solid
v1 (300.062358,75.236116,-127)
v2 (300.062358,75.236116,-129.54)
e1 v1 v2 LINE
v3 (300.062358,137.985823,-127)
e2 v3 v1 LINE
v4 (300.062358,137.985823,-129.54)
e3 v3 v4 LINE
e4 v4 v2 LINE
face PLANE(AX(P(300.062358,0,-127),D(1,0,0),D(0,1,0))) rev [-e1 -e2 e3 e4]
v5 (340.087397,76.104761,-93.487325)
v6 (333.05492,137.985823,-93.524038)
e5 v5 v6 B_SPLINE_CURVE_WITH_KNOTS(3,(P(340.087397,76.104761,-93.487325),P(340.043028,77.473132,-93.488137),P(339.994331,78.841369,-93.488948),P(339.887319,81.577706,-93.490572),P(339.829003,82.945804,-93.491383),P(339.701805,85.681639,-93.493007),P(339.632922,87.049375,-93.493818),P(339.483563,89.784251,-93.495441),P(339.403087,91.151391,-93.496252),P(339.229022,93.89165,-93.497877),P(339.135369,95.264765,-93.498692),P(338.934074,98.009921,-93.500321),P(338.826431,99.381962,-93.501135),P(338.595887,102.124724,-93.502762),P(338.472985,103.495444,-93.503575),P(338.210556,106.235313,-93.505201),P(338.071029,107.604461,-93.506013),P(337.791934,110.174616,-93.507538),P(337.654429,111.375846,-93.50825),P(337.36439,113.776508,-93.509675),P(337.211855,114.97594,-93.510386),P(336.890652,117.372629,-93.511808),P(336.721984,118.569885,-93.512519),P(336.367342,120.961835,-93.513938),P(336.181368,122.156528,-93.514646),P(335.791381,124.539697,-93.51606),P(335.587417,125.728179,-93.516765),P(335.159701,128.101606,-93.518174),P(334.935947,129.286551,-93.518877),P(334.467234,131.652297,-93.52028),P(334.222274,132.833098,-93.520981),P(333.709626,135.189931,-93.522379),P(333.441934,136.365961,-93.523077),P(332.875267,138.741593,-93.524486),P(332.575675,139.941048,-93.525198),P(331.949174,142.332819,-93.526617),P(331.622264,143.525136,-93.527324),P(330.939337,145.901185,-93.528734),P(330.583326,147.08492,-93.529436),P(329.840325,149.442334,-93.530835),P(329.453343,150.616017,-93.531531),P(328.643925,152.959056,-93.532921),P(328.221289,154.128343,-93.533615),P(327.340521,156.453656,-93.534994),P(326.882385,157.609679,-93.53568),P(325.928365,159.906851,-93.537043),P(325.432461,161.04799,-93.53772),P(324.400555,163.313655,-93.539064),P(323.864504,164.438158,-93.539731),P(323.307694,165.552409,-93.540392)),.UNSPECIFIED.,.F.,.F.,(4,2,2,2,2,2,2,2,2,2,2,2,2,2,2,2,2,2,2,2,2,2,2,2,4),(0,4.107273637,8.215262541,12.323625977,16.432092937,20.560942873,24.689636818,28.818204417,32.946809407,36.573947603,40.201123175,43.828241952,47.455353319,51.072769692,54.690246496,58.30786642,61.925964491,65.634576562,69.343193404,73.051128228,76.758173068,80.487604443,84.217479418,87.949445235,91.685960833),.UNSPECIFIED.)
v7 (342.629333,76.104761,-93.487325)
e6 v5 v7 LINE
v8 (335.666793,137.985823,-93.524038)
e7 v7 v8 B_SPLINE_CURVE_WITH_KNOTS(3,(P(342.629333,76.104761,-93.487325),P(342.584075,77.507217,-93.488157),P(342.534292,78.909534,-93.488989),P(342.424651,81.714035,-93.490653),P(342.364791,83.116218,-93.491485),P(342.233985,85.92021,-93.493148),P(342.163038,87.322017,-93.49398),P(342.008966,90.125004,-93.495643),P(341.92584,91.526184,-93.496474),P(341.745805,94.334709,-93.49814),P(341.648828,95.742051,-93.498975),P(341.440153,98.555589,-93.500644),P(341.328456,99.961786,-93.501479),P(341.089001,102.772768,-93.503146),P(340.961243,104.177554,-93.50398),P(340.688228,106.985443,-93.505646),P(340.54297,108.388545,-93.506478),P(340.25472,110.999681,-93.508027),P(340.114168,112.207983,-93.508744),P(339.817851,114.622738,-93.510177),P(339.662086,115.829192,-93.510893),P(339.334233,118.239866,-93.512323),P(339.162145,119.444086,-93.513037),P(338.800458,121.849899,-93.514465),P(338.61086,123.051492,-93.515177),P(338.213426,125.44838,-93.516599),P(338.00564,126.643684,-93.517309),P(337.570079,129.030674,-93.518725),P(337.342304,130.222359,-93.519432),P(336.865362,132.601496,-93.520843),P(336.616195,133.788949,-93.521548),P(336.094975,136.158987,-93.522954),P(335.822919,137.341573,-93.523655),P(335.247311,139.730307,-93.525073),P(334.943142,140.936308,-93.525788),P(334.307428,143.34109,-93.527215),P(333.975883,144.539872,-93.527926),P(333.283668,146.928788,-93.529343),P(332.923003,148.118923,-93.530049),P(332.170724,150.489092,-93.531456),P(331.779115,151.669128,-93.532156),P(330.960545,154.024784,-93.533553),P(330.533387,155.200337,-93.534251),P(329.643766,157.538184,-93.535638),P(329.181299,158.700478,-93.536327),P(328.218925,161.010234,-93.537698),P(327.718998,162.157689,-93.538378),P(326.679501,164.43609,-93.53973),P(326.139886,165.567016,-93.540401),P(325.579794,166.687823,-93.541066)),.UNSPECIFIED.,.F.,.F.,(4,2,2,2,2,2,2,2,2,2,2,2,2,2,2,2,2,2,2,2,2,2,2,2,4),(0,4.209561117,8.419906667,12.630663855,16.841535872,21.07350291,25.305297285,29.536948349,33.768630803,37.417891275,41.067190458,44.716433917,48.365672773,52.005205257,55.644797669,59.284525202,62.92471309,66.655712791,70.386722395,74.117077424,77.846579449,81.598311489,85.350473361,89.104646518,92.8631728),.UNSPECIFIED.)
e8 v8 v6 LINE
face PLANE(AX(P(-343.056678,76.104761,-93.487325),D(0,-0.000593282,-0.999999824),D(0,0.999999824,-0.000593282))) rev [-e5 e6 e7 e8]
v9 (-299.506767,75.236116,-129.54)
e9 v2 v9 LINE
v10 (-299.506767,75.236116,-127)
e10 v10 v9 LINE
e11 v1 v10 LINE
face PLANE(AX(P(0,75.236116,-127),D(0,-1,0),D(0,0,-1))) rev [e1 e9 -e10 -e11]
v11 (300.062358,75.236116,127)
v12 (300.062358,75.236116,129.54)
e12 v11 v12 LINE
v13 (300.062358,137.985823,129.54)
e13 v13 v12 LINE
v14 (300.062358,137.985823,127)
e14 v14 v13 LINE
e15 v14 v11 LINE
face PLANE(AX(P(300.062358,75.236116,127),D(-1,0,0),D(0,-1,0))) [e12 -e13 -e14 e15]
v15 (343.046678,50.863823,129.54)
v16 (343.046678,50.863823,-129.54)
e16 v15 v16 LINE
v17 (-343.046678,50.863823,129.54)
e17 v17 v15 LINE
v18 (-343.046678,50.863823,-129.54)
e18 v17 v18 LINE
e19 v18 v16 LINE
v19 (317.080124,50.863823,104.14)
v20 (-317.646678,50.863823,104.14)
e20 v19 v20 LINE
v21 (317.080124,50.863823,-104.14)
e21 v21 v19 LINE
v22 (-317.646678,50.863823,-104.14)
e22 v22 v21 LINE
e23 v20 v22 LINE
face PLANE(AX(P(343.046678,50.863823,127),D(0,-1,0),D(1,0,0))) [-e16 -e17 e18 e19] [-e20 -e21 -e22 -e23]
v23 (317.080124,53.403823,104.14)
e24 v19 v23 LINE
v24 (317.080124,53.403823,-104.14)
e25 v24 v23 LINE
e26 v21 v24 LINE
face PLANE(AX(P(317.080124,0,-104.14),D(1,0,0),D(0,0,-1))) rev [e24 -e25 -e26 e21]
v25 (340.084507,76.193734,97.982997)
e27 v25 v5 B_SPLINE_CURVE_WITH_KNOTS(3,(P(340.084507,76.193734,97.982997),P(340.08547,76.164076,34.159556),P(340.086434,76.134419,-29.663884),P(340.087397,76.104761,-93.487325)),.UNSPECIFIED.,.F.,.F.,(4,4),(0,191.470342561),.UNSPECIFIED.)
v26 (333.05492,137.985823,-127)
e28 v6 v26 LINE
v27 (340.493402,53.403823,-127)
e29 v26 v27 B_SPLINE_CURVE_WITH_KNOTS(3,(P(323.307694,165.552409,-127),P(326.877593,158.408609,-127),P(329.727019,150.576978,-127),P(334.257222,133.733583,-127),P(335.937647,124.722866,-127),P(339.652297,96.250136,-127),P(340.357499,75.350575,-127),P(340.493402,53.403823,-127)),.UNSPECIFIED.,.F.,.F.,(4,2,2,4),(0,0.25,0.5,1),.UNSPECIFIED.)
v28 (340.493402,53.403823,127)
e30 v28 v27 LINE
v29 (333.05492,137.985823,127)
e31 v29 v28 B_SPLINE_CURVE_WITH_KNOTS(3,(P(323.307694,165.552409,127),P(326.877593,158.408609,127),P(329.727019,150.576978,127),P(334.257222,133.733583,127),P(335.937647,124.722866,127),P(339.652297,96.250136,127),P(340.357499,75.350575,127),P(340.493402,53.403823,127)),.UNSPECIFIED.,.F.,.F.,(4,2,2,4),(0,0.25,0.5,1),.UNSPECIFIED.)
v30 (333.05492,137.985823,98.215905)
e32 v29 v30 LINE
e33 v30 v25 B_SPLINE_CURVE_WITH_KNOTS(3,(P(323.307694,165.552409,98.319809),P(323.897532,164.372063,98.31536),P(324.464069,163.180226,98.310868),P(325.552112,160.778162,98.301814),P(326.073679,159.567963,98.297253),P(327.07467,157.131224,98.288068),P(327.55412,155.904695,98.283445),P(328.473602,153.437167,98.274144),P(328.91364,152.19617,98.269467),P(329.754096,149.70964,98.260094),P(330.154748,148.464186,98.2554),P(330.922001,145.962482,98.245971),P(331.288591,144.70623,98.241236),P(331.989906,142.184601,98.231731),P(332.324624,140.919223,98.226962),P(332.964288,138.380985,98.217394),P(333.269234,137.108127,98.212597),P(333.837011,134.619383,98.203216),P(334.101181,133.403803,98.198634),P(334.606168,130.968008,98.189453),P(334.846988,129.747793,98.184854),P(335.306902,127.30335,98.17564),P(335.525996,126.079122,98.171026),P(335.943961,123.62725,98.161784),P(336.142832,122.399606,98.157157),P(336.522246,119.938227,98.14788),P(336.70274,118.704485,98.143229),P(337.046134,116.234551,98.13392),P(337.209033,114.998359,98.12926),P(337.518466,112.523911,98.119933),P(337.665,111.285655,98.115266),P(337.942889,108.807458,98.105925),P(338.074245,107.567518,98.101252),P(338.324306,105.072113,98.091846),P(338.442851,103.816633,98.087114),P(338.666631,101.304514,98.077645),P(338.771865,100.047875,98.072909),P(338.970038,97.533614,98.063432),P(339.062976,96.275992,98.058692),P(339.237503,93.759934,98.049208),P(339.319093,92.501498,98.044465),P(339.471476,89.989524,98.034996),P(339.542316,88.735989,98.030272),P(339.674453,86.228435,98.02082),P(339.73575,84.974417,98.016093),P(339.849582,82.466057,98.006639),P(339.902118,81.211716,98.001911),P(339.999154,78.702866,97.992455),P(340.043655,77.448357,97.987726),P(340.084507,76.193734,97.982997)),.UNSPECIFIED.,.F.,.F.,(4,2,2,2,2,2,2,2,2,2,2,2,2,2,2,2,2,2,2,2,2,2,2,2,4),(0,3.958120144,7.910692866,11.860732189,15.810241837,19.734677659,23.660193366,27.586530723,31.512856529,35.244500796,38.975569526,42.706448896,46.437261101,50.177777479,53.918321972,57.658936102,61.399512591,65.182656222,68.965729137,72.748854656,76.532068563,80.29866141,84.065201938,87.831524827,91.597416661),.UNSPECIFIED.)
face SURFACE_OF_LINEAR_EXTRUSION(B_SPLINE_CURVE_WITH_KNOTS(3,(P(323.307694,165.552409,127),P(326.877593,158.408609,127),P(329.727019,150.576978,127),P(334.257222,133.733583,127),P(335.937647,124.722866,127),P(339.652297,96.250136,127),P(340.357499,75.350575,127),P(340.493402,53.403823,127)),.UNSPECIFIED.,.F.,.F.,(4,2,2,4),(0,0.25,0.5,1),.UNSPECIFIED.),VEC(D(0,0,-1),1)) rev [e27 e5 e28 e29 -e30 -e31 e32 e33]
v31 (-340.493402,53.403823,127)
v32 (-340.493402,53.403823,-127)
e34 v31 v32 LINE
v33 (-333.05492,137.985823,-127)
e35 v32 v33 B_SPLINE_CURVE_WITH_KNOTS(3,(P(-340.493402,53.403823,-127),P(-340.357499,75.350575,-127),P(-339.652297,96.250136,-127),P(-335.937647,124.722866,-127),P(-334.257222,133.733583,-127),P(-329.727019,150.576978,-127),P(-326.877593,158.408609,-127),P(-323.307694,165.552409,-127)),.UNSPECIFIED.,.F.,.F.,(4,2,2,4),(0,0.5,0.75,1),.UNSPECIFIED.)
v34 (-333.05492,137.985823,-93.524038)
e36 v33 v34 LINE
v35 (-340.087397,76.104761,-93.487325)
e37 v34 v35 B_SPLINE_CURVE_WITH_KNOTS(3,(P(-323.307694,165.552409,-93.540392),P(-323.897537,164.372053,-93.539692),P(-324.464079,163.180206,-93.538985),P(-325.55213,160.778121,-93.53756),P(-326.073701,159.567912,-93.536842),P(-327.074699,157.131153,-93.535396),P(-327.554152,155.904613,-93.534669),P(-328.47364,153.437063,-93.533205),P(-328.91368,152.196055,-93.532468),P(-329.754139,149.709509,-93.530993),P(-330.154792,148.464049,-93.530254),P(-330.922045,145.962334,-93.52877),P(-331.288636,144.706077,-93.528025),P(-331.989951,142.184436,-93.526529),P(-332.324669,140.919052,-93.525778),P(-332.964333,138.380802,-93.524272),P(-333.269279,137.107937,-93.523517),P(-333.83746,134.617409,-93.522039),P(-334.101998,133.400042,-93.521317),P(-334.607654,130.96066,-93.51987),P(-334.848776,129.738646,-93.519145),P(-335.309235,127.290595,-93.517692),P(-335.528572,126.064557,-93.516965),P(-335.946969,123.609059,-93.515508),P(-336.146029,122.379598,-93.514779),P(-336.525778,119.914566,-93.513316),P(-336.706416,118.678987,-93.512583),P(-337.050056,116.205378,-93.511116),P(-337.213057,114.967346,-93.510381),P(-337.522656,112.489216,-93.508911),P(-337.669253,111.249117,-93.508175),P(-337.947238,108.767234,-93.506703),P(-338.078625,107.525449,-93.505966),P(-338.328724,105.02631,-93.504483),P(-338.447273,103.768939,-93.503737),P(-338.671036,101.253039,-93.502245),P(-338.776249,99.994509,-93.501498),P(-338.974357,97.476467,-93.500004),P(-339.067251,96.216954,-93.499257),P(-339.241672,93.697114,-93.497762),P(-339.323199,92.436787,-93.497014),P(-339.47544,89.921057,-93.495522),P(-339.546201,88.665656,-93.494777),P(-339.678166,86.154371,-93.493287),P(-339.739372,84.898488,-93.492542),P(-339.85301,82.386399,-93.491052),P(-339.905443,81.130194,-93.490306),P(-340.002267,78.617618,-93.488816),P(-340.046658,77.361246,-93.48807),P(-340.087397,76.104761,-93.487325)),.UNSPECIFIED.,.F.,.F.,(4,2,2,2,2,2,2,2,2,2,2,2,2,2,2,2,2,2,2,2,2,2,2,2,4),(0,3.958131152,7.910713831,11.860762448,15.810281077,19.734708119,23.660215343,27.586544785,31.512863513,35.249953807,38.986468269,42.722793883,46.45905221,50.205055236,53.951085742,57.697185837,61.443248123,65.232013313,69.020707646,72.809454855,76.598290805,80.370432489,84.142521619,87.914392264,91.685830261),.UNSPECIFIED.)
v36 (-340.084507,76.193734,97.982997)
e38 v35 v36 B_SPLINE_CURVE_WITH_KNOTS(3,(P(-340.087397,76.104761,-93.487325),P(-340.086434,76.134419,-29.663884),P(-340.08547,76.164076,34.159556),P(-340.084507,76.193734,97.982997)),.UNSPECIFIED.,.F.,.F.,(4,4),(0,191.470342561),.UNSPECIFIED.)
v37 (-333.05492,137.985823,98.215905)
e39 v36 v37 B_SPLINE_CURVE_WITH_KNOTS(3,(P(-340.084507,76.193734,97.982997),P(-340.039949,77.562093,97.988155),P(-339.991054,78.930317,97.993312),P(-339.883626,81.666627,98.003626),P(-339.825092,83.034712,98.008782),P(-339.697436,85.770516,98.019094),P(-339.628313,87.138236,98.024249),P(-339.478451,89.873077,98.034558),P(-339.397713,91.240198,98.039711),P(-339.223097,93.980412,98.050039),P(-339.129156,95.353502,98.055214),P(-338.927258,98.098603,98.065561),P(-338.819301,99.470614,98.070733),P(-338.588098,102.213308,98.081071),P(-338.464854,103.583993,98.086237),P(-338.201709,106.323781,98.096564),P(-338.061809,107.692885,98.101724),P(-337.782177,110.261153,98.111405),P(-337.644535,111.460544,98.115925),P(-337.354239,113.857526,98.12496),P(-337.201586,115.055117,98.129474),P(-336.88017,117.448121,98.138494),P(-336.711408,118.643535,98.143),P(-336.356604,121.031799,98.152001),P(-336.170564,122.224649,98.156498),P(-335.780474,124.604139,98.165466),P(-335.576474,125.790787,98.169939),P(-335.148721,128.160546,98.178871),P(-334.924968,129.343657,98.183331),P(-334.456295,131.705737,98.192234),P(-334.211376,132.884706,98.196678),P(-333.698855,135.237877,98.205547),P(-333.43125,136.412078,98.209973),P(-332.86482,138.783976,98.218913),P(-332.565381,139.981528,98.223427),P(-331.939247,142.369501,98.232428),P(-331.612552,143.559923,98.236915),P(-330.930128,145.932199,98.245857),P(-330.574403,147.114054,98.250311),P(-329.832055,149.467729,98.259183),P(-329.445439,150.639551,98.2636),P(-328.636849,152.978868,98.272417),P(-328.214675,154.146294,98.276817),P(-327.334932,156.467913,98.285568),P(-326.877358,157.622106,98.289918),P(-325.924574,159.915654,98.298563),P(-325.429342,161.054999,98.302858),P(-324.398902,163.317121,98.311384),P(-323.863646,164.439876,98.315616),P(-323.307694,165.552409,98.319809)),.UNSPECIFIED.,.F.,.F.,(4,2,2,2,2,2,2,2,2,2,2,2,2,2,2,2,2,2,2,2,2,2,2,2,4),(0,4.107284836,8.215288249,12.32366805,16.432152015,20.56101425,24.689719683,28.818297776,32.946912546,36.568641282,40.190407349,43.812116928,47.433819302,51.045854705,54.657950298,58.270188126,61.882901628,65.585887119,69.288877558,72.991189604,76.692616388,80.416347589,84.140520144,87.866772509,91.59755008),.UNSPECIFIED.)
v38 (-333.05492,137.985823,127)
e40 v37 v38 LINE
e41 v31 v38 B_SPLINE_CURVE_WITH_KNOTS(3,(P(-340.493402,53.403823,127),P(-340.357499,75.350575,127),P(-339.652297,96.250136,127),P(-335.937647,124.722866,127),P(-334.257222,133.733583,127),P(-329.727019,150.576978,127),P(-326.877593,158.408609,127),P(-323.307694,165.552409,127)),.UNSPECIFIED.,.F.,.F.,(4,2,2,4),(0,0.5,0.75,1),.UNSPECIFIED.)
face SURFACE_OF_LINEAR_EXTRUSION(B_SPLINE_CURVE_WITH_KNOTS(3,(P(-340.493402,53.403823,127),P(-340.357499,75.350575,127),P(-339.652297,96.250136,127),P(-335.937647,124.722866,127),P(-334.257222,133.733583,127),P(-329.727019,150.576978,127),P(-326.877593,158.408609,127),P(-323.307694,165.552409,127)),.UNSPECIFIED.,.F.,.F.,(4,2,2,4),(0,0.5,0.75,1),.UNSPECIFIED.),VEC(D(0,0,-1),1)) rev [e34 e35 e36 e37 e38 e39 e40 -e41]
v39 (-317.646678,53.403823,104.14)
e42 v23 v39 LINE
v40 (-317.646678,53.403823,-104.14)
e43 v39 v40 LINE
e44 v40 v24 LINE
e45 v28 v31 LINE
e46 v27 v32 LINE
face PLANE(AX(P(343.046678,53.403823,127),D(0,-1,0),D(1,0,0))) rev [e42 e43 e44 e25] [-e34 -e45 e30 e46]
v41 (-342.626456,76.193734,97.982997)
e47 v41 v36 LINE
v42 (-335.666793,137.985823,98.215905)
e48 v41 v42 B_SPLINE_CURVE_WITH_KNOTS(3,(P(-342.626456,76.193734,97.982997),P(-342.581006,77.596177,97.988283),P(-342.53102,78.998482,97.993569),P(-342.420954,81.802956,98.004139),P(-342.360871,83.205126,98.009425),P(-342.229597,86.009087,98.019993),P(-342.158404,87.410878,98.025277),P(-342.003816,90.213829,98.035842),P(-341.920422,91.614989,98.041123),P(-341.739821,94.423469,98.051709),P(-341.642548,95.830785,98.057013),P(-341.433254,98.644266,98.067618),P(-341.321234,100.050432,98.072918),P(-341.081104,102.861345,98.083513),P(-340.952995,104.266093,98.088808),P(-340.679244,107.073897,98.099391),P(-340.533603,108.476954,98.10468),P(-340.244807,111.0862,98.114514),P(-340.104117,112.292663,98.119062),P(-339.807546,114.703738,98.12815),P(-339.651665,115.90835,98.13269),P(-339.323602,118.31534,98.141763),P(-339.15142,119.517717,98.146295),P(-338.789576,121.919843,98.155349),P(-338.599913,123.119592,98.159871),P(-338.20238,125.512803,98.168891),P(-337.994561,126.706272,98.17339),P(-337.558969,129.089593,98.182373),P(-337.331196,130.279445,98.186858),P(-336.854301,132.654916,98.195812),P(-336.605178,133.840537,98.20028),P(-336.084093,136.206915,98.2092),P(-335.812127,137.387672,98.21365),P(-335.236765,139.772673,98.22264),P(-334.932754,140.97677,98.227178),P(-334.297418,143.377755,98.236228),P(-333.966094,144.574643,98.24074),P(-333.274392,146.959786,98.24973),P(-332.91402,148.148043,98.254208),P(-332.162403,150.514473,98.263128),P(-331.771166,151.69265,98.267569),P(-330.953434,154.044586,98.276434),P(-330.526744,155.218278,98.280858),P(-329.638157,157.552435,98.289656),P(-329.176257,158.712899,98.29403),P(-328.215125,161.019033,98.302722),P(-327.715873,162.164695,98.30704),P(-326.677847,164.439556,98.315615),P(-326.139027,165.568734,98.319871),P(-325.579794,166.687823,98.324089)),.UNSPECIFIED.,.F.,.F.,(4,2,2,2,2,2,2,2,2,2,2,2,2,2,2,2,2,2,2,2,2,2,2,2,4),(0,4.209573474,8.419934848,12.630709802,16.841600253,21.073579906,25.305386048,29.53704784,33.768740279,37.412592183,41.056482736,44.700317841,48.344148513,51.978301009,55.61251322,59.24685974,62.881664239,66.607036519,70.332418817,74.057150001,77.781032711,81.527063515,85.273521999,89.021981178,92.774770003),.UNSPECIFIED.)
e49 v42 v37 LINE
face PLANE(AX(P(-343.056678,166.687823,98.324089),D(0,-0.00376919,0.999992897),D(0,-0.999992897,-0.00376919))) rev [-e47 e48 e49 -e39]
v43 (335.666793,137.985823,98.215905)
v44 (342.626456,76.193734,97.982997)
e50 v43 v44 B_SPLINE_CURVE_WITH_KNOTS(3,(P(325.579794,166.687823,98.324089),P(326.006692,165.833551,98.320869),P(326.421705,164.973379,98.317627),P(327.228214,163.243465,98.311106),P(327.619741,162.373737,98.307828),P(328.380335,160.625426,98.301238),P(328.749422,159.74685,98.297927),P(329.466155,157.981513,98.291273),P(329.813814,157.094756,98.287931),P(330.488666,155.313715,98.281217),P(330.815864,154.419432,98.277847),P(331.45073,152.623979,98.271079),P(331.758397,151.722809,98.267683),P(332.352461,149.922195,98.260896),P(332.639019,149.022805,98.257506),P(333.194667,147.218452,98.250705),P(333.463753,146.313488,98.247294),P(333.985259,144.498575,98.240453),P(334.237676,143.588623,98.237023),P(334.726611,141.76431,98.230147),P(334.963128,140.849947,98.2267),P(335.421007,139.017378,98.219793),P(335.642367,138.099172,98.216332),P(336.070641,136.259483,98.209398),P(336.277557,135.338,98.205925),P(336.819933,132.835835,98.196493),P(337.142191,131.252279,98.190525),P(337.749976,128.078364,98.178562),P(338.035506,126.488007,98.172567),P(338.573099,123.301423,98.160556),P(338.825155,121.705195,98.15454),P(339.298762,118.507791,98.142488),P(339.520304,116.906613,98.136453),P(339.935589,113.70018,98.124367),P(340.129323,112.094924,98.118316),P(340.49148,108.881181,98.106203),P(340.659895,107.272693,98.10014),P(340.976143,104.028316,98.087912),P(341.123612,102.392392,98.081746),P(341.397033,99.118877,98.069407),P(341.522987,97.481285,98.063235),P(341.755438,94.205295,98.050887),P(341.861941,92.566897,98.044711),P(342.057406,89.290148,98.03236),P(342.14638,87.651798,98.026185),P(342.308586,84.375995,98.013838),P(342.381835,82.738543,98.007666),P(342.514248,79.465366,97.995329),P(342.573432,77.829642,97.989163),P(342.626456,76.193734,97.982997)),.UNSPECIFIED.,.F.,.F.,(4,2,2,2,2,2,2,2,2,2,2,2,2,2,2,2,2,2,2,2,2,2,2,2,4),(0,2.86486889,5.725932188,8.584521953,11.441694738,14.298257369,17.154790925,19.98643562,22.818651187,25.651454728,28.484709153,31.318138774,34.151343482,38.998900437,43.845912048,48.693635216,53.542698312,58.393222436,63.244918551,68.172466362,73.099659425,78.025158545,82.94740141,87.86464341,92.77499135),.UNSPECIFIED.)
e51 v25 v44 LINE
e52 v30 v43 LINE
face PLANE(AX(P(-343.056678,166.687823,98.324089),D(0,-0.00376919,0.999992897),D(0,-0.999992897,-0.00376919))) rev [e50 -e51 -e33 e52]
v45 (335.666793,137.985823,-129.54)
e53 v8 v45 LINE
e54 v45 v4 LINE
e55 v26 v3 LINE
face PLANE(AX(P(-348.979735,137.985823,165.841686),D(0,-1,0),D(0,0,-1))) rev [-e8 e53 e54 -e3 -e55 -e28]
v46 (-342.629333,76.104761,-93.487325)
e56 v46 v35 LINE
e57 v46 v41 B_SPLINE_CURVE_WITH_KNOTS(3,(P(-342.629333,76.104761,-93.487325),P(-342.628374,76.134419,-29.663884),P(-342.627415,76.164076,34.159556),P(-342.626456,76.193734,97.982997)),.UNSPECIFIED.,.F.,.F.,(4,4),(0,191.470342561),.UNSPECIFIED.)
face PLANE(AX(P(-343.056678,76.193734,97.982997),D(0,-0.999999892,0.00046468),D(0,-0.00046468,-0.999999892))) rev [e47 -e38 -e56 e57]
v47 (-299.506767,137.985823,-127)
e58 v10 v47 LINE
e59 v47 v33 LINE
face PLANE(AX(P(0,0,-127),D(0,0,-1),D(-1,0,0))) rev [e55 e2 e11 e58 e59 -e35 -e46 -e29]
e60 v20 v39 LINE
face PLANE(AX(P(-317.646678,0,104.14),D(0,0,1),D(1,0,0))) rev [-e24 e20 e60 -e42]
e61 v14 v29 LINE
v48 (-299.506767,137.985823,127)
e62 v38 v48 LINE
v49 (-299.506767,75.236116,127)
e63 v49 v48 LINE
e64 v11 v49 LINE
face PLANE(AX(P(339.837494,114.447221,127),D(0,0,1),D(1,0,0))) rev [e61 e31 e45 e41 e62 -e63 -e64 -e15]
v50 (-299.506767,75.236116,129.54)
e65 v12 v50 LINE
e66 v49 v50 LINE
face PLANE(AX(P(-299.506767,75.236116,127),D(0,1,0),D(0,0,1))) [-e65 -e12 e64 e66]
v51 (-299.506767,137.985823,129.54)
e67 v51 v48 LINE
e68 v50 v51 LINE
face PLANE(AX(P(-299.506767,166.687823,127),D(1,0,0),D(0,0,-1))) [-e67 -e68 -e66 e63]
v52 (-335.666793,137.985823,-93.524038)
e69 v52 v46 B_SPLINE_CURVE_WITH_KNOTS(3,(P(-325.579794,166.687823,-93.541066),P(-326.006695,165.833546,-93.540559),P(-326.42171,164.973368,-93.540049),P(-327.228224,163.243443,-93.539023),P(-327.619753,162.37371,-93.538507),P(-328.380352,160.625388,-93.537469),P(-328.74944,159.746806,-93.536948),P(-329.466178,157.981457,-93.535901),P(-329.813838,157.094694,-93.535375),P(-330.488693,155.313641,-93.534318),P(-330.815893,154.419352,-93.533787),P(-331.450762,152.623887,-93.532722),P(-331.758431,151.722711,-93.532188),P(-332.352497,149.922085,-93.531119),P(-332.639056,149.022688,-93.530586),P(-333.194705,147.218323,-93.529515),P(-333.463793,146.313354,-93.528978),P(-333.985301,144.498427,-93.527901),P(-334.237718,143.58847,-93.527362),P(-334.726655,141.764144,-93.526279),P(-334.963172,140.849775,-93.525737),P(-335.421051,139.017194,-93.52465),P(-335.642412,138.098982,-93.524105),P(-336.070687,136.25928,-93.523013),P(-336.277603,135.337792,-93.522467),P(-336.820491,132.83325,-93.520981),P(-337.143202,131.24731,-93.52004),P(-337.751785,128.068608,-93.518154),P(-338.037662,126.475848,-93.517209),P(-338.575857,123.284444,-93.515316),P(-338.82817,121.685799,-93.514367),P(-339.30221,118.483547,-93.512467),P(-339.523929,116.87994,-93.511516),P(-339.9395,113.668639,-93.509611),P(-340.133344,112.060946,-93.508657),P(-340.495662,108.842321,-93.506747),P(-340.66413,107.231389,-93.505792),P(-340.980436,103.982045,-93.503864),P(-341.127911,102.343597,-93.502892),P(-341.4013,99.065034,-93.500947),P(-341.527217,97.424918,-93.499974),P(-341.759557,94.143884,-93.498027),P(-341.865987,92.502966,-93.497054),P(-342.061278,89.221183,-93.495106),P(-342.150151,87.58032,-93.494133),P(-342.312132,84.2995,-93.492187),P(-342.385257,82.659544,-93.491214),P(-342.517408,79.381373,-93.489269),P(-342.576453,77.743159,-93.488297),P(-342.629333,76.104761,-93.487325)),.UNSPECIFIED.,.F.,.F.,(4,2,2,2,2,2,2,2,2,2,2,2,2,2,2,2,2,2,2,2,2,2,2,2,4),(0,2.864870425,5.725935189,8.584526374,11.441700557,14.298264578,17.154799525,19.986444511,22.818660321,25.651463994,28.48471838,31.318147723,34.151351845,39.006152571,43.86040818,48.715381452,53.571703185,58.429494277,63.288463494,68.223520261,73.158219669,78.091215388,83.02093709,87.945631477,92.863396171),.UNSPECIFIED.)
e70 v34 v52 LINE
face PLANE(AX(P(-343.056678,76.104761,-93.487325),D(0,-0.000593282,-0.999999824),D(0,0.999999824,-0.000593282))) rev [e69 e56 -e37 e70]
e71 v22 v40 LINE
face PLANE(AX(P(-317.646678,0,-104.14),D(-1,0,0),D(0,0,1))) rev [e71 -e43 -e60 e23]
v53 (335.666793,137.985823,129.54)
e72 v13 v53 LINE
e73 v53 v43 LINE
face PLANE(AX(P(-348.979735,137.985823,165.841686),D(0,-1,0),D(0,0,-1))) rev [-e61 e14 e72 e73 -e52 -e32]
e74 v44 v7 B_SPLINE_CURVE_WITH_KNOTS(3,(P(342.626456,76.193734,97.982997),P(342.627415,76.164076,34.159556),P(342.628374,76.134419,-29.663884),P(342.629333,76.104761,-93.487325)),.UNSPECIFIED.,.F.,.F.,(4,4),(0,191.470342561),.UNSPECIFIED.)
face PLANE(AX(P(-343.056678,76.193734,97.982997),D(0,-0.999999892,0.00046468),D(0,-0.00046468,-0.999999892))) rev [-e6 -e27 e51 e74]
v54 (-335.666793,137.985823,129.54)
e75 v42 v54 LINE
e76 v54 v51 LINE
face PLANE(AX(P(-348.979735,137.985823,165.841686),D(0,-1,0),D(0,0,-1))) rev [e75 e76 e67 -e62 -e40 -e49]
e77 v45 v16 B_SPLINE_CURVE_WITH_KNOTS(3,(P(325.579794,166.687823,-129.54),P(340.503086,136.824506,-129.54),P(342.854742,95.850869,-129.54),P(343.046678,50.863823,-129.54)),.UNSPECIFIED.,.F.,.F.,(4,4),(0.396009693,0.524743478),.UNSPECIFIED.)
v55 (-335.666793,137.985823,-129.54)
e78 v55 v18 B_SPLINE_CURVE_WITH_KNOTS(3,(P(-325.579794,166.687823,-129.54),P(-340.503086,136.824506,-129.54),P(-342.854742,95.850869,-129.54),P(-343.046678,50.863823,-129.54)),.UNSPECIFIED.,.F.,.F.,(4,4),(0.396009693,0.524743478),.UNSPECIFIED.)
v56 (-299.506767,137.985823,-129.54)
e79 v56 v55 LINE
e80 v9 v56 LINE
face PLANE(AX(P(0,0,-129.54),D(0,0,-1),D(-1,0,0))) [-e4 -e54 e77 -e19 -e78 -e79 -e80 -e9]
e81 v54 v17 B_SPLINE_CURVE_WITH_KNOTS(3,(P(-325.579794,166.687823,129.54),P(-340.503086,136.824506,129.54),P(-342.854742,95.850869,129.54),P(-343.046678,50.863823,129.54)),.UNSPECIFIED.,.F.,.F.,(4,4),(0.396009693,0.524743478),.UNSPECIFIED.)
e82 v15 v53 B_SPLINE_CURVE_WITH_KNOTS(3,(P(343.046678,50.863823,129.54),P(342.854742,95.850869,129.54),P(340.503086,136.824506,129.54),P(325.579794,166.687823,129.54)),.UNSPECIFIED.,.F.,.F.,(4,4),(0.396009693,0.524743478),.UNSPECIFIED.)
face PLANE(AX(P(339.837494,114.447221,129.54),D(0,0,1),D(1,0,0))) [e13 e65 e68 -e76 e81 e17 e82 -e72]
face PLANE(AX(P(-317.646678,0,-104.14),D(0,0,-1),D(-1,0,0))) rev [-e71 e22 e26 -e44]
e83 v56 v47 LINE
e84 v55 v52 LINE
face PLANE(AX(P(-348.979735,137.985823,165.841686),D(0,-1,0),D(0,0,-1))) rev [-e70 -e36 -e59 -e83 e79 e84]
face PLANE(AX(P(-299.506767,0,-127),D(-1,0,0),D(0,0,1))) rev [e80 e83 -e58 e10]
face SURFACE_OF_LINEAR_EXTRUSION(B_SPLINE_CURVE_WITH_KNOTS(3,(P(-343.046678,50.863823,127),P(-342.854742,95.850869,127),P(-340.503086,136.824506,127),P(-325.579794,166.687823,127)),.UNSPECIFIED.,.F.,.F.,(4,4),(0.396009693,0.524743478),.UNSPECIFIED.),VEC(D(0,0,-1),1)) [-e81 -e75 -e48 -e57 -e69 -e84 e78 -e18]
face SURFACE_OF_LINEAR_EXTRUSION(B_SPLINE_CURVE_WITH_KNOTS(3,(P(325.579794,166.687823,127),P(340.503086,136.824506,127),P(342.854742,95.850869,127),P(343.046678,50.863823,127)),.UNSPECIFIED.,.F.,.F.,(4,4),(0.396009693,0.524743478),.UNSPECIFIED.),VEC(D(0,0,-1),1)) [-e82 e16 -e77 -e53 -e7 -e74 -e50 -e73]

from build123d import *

# Parameters (mm, degrees)
EXTRUDE_THIN2_START    = -127
EXTRUDE_THIN2_DEPTH    = 254
SPLIT1_SURFACE_1_BACK  = 741.713
SPLIT1_SURFACE_1_DEPTH = 1483.426
BOSS_EXTRUDE2_DEPTH    = 2.54
BOSS_EXTRUDE3_DEPTH    = 2.54
SPLIT2_SURFACE_2_BACK  = 743.47
SPLIT2_SURFACE_2_DEPTH = 1486.94
SPLIT3_SURFACE_3_BACK  = 743.47
SPLIT3_SURFACE_3_DEPTH = 1486.94


# Read off the part's stored shape, not the designer's step: Extrude-Thin2
with BuildPart() as part:
    # Extrude-Thin2 outline → Extrude-Thin2 (new body)
    with BuildSketch(Plane.XY.offset(EXTRUDE_THIN2_START)):
        with BuildLine():
            Line((-325.542449195, 166.687822519), (-325.542449195, 166.669160537))
            Line((-325.542449195, 166.669160537), (-325.579794085, 166.687822519))
            add(Edge.make_bspline(
                [(-343.046678298, 50.863822519), (-342.854742326, 95.850869045), (-340.503085509, 136.824505781), (-325.579794085, 166.687822519)],
                knots=[0.396009693, 0.396009693, 0.396009693, 0.396009693, 0.524743478, 0.524743478, 0.524743478, 0.524743478], degree=3))
            Line((-343.046678298, 50.863822519), (343.046678298, 50.863822519))
            add(Edge.make_bspline(
                [(325.579794084, 166.687822519), (340.503085509, 136.824505781), (342.854742326, 95.850869045), (343.046678298, 50.863822519)],
                knots=[0.396009693, 0.396009693, 0.396009693, 0.396009693, 0.524743478, 0.524743478, 0.524743478, 0.524743478], degree=3))
            Line((325.579794084, 166.687822519), (323.307694442, 165.552409283))
            add(Edge.make_bspline(
                [(323.307694442, 165.552409283), (326.877593275, 158.408608594), (329.727019011, 150.576977672), (334.257221566, 133.733582984), (335.93764666, 124.722865717), (339.652297398, 96.250136339), (340.357498858, 75.350575466), (340.493401884, 53.403822519)],
                knots=[0, 0, 0, 0, 0.25, 0.25, 0.5, 0.5, 1, 1, 1, 1], degree=3))
            Line((340.493401884, 53.403822519), (-340.493401884, 53.403822519))
            add(Edge.make_bspline(
                [(-340.493401884, 53.403822519), (-340.357498858, 75.350575466), (-339.652297398, 96.250136339), (-335.937646661, 124.722865717), (-334.257221567, 133.733582984), (-329.727019012, 150.576977672), (-326.877593276, 158.408608594), (-323.307694443, 165.552409283)],
                knots=[0, 0, 0, 0, 0.5, 0.5, 0.75, 0.75, 1, 1, 1, 1], degree=3))
            Line((-323.307694443, 165.552409283), (-325.502746425, 166.649320276))
            Line((-325.502746425, 166.649320276), (-325.502746425, 166.687822519))
            Line((-325.502746425, 166.687822519), (-325.542449195, 166.687822519))
        make_face()
    extrude(amount=EXTRUDE_THIN2_DEPTH)

    # Split1: cut with a surface, the side behind it stays
    # Split1 surface: a surface, the sketch's curves swept straight by 1483.426 mm
    with BuildLine(Plane(origin=(0, 0, 0), x_dir=(0, 0, -1), z_dir=(1, 0, 0)).offset(-SPLIT1_SURFACE_1_BACK), mode=Mode.PRIVATE) as split1_surface_1_path:
        Line((-98.324088945, 166.687822519), (-97.98299712, 76.193733858))
        Line((-97.98299712, 76.193733858), (93.487324748, 76.104761498))
        Line((93.487324748, 76.104761498), (93.541066072, 166.687822519))
        Line((93.541066072, 166.687822519), (-98.324088945, 166.687822519))
    split1_surface_1 = Shell.extrude(split1_surface_1_path.wire(), (1 * SPLIT1_SURFACE_1_DEPTH, 0 * SPLIT1_SURFACE_1_DEPTH, 0 * SPLIT1_SURFACE_1_DEPTH))
    split(bisect_by=split1_surface_1, keep=Keep.BOTTOM)

    # Sketch6 → Boss-Extrude2 (add)
    with BuildSketch(Plane.XY.offset(129.54)):
        with BuildLine():
            Line((343.046678298, 50.863822519), (-343.046678298, 50.863822519))
            add(Edge.make_bspline(
                [(-325.579794085, 166.687822519), (-340.503085509, 136.824505781), (-342.854742326, 95.850869045), (-343.046678298, 50.863822519)],
                knots=[0.396009693, 0.396009693, 0.396009693, 0.396009693, 0.524743478, 0.524743478, 0.524743478, 0.524743478], degree=3))
            Line((-325.579794085, 166.687822519), (-325.542449195, 166.687822519))
            Line((-325.542449195, 166.687822519), (-299.506767133, 166.687822519))
            Line((-299.506767133, 166.687822519), (-299.506767133, 75.23611572))
            Line((-299.506767133, 75.23611572), (300.062358087, 75.23611572))
            Line((300.062358087, 75.23611572), (300.062358087, 166.687822519))
            Line((300.062358087, 166.687822519), (325.579794084, 166.687822519))
            add(Edge.make_bspline(
                [(325.579794084, 166.687822519), (340.503085509, 136.824505781), (342.854742326, 95.850869045), (343.046678298, 50.863822519)],
                knots=[0.396009693, 0.396009693, 0.396009693, 0.396009693, 0.524743478, 0.524743478, 0.524743478, 0.524743478], degree=3))
        make_face()
    extrude(amount=-BOSS_EXTRUDE2_DEPTH)

    # Sketch7 → Boss-Extrude3 (add)
    with BuildSketch(Plane(origin=(0, 0, -129.54), x_dir=(-1, 0, 0), z_dir=(0, 0, -1))):
        with BuildLine():
            Line((0, 50.863822519), (0, 75.23611572))
            Line((0, 75.23611572), (-300.062358087, 75.23611572))
            Line((-300.062358087, 75.23611572), (-300.062358087, 166.687822519))
            Line((-300.062358087, 166.687822519), (-325.502746425, 166.687822519))
            Line((-325.502746425, 166.687822519), (-325.542449195, 166.687822519))
            Line((-325.542449195, 166.687822519), (-325.579794085, 166.687822519))
            add(Edge.make_bspline(
                [(-325.579794085, 166.687822519), (-340.503085509, 136.824505781), (-342.854742326, 95.850869045), (-343.046678298, 50.863822519)],
                knots=[0.396009693, 0.396009693, 0.396009693, 0.396009693, 0.524743478, 0.524743478, 0.524743478, 0.524743478], degree=3))
            Line((-343.046678298, 50.863822519), (0, 50.863822519))
        make_face()
        with BuildLine():
            Line((299.506767133, 75.23611572), (0, 75.23611572))
            Line((0, 75.23611572), (0, 50.863822519))
            Line((0, 50.863822519), (343.046678298, 50.863822519))
            add(Edge.make_bspline(
                [(325.579794084, 166.687822519), (340.503085509, 136.824505781), (342.854742326, 95.850869045), (343.046678298, 50.863822519)],
                knots=[0.396009693, 0.396009693, 0.396009693, 0.396009693, 0.524743478, 0.524743478, 0.524743478, 0.524743478], degree=3))
            Line((325.579794084, 166.687822519), (299.506767133, 166.687822519))
            Line((299.506767133, 166.687822519), (299.506767133, 75.23611572))
        make_face()
    extrude(amount=-BOSS_EXTRUDE3_DEPTH)

    # Split2: cut with a surface, the side it looks to stays
    # Split2 surface: a surface, the sketch's curves swept straight by 1486.94 mm
    with BuildLine(Plane(origin=(0, 0, 0), x_dir=(1, 0, 0), z_dir=(0, 1, 0)).offset(-SPLIT2_SURFACE_2_BACK), mode=Mode.PRIVATE) as split2_surface_2_path:
        Line((-317.646678298, 104.14), (317.080123639, 104.14))
        Line((317.080123639, 104.14), (317.080123639, -104.14))
        Line((317.080123639, -104.14), (-317.646678298, -104.14))
        Line((-317.646678298, -104.14), (-317.646678298, 104.14))
    split2_surface_2 = Shell.extrude(split2_surface_2_path.wire(), (0 * SPLIT2_SURFACE_2_DEPTH, 1 * SPLIT2_SURFACE_2_DEPTH, 0 * SPLIT2_SURFACE_2_DEPTH))
    split(bisect_by=split2_surface_2, keep=Keep.TOP)

    # Split3: cut with a surface, the side behind it stays
    # Split3 surface: a surface, the sketch's curves swept straight by 1486.94 mm
    with BuildLine(Plane(origin=(0, 0, 0), x_dir=(0, 0, -1), z_dir=(1, 0, 0)).offset(-SPLIT3_SURFACE_3_BACK), mode=Mode.PRIVATE) as split3_surface_3_path:
        Line((-165.841686169, 137.985822519), (168.310027545, 137.985822519))
    split3_surface_3 = Shell.extrude(split3_surface_3_path.wire(), (1 * SPLIT3_SURFACE_3_DEPTH, 0 * SPLIT3_SURFACE_3_DEPTH, 0 * SPLIT3_SURFACE_3_DEPTH))
    split(bisect_by=split3_surface_3, keep=Keep.BOTTOM)


solid = part.part
